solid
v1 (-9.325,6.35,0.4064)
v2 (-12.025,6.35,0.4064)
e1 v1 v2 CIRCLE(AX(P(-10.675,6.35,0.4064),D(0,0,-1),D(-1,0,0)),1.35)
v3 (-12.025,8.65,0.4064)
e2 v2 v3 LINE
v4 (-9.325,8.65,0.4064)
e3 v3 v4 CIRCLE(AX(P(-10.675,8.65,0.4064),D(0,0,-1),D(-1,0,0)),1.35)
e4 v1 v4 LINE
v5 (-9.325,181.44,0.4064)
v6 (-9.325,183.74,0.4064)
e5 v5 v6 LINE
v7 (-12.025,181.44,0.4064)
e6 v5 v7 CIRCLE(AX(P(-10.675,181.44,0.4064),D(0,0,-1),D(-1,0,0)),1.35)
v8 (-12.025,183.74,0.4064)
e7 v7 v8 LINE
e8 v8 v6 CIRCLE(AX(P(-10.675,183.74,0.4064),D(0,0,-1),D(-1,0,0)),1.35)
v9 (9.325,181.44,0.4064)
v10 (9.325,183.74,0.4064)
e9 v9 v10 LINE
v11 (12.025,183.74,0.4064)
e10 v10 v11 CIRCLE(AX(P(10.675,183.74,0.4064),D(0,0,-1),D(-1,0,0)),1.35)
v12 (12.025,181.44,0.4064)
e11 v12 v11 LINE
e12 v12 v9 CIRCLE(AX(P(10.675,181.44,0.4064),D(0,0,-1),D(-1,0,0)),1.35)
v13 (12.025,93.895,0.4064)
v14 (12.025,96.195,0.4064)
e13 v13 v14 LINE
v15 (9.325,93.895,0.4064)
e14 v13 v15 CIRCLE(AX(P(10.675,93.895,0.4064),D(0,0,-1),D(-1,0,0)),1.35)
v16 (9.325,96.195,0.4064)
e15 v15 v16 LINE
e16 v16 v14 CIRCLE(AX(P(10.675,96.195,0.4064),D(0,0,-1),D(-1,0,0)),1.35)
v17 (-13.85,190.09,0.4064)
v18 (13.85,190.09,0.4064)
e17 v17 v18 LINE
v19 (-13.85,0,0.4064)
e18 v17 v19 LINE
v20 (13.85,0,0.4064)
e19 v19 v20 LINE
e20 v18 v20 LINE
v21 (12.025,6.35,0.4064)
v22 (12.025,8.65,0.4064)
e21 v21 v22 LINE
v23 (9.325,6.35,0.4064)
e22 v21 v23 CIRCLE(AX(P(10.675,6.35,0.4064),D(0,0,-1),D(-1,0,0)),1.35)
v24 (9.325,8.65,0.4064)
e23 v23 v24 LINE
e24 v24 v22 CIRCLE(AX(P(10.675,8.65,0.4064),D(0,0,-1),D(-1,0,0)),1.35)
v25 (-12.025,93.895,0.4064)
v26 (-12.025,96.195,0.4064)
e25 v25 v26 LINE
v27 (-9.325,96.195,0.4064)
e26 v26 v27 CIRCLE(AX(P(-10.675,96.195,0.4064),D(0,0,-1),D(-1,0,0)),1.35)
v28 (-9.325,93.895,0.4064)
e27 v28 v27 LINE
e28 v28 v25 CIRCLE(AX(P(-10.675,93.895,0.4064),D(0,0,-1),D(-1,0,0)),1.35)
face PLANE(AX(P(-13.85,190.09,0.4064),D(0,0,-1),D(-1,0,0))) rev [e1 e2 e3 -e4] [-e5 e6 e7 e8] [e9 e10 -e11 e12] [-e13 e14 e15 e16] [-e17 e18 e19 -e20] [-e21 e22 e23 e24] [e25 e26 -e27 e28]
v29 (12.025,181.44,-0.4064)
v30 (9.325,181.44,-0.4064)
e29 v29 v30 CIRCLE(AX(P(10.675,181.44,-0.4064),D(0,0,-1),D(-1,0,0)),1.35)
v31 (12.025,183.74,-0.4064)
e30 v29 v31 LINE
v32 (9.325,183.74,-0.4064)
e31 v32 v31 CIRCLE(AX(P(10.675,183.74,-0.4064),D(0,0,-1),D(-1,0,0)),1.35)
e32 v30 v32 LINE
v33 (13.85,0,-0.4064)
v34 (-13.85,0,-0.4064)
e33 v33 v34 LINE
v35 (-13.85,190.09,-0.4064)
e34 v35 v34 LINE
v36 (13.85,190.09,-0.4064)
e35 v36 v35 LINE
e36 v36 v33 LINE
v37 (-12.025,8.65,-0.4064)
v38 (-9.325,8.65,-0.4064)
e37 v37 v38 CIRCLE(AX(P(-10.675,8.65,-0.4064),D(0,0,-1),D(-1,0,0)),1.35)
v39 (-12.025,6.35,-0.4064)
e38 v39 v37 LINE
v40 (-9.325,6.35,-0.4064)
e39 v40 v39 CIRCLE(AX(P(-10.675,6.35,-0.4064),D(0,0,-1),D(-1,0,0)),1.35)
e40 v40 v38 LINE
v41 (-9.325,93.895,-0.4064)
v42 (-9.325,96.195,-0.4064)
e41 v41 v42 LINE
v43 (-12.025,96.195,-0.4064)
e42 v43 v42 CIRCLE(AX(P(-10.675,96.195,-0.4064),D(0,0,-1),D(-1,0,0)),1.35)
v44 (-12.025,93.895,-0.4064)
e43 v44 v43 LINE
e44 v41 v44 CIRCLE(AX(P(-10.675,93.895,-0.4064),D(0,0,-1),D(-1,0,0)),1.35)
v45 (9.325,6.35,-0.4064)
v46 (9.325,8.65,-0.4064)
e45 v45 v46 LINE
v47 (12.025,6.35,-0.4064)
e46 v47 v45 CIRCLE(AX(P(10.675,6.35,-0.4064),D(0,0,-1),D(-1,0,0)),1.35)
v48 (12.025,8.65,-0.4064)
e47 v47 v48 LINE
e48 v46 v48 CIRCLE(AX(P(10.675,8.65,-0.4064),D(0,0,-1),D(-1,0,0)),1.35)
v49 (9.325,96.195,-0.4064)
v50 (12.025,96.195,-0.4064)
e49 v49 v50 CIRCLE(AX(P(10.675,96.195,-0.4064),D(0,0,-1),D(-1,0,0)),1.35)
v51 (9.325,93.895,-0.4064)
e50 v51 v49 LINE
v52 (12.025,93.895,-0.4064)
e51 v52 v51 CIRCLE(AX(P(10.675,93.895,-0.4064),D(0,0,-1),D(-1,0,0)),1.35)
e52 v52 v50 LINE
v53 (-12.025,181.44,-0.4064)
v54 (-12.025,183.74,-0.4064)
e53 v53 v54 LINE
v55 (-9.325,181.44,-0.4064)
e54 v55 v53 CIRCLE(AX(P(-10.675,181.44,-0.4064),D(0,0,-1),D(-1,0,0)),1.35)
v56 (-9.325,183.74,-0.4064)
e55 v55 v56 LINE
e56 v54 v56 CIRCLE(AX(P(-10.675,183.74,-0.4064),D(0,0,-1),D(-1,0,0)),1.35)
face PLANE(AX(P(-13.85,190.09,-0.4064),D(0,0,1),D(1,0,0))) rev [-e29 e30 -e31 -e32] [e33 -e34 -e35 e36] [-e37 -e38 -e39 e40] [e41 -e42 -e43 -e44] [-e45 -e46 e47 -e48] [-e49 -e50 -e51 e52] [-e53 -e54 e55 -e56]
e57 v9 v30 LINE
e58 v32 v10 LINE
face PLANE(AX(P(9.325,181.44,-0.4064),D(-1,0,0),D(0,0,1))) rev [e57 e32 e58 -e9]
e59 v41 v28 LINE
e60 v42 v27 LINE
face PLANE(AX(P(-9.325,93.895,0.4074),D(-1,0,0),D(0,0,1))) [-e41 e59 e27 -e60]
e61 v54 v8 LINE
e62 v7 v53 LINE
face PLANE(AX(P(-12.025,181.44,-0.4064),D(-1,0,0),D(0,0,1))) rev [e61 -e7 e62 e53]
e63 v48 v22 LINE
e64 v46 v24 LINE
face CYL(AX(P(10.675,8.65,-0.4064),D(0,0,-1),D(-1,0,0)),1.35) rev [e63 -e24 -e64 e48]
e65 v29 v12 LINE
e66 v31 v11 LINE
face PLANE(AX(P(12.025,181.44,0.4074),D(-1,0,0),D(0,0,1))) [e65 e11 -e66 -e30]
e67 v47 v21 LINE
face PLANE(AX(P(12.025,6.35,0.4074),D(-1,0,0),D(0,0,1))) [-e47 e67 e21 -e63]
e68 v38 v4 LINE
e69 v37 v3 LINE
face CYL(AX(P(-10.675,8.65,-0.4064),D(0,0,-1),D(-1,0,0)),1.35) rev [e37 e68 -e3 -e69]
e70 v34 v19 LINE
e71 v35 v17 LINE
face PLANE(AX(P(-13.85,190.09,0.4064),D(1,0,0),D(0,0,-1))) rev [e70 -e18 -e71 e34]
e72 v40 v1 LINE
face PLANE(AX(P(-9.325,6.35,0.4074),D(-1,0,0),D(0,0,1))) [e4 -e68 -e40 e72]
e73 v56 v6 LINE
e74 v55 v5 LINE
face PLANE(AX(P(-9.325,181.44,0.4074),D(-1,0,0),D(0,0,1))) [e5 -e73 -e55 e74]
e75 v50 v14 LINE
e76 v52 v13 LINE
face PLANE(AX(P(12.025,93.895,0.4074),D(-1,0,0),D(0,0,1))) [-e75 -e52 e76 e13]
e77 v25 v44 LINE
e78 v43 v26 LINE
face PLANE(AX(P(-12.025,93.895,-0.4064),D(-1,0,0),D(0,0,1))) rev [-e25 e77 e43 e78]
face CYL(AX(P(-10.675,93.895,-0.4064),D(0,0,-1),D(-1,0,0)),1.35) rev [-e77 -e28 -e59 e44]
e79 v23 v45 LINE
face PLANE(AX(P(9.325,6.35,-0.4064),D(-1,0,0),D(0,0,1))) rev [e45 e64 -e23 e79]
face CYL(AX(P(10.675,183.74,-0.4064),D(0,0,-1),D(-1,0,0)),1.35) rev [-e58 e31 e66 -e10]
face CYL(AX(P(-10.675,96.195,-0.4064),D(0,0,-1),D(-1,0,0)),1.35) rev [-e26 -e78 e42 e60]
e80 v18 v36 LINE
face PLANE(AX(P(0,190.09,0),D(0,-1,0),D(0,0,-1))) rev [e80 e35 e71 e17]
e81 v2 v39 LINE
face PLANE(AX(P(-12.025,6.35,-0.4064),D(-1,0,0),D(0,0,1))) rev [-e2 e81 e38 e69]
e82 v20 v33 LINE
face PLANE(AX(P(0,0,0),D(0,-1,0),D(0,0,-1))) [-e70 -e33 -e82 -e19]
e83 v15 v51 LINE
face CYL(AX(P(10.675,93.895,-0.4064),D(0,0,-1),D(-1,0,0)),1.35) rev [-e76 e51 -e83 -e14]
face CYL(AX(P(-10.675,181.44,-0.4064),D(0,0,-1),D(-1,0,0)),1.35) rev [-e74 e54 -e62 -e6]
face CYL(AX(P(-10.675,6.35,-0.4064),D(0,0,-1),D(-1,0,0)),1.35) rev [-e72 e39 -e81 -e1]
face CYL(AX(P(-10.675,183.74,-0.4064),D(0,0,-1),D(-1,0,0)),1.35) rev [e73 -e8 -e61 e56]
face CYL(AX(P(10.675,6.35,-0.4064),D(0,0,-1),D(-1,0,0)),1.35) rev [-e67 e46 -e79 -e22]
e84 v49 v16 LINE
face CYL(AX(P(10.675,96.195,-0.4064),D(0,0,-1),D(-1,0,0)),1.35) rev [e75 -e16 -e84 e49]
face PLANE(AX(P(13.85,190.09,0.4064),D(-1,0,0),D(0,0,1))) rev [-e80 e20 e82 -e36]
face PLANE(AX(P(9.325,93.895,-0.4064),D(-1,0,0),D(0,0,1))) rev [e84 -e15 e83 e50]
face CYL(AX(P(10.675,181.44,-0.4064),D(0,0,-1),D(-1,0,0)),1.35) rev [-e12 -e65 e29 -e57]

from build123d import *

# Parameters (mm, degrees)
SKETCH1_W                  = 27.7
SKETCH1_H                  = 0.8128
BOSS_EXTRUDE1_DEPTH        = 190.09
M2_5_START                 = -0.4064
M2_5_CLEARANCE_SLOT2_DEPTH = 0.8128


# Read off the part's stored shape, not the designer's step: M2.5 Clearance Slot2
with BuildPart() as part:
    # Sketch1 → Boss-Extrude1 (new body)
    with BuildSketch(Plane(origin=(0, 0, 0), x_dir=(1, 0, 0), z_dir=(0, 1, 0))):
        Rectangle(SKETCH1_W, SKETCH1_H)
    extrude(amount=BOSS_EXTRUDE1_DEPTH)

    # M2.5 Clearance Slot2 outline → M2.5 Clearance Slot2 (cut)
    with BuildSketch(Plane.XY.offset(M2_5_START)):
        with BuildLine():
            ThreePointArc((-9.325, 96.195), (-10.675, 97.545), (-12.025, 96.195))
            Line((-12.025, 96.195), (-12.025, 93.895))
            ThreePointArc((-12.025, 93.895), (-10.675, 92.545), (-9.325, 93.895))
            Line((-9.325, 93.895), (-9.325, 96.195))
        make_face()
        with BuildLine():
            Line((-9.325, 181.44), (-9.325, 183.74))
            ThreePointArc((-9.325, 183.74), (-10.675, 185.09), (-12.025, 183.74))
            Line((-12.025, 183.74), (-12.025, 181.44))
            ThreePointArc((-12.025, 181.44), (-10.675, 180.09), (-9.325, 181.44))
        make_face()
        with BuildLine():
            Line((-9.325, 6.35), (-9.325, 8.65))
            ThreePointArc((-9.325, 8.65), (-10.675, 10), (-12.025, 8.65))
            Line((-12.025, 8.65), (-12.025, 6.35))
            ThreePointArc((-12.025, 6.35), (-10.675, 5), (-9.325, 6.35))
        make_face()
        with BuildLine():
            ThreePointArc((12.025, 96.195), (10.675, 97.545), (9.325, 96.195))
            Line((9.325, 96.195), (9.325, 93.895))
            ThreePointArc((9.325, 93.895), (10.675, 92.545), (12.025, 93.895))
            Line((12.025, 93.895), (12.025, 96.195))
        make_face()
        with BuildLine():
            Line((12.025, 181.44), (12.025, 183.74))
            ThreePointArc((12.025, 183.74), (10.675, 185.09), (9.325, 183.74))
            Line((9.325, 183.74), (9.325, 181.44))
            ThreePointArc((9.325, 181.44), (10.675, 180.09), (12.025, 181.44))
        make_face()
        with BuildLine():
            Line((12.025, 6.35), (12.025, 8.65))
            ThreePointArc((12.025, 8.65), (10.675, 10), (9.325, 8.65))
            Line((9.325, 8.65), (9.325, 6.35))
            ThreePointArc((9.325, 6.35), (10.675, 5), (12.025, 6.35))
        make_face()
    extrude(amount=M2_5_CLEARANCE_SLOT2_DEPTH, mode=Mode.SUBTRACT)


solid = part.part
